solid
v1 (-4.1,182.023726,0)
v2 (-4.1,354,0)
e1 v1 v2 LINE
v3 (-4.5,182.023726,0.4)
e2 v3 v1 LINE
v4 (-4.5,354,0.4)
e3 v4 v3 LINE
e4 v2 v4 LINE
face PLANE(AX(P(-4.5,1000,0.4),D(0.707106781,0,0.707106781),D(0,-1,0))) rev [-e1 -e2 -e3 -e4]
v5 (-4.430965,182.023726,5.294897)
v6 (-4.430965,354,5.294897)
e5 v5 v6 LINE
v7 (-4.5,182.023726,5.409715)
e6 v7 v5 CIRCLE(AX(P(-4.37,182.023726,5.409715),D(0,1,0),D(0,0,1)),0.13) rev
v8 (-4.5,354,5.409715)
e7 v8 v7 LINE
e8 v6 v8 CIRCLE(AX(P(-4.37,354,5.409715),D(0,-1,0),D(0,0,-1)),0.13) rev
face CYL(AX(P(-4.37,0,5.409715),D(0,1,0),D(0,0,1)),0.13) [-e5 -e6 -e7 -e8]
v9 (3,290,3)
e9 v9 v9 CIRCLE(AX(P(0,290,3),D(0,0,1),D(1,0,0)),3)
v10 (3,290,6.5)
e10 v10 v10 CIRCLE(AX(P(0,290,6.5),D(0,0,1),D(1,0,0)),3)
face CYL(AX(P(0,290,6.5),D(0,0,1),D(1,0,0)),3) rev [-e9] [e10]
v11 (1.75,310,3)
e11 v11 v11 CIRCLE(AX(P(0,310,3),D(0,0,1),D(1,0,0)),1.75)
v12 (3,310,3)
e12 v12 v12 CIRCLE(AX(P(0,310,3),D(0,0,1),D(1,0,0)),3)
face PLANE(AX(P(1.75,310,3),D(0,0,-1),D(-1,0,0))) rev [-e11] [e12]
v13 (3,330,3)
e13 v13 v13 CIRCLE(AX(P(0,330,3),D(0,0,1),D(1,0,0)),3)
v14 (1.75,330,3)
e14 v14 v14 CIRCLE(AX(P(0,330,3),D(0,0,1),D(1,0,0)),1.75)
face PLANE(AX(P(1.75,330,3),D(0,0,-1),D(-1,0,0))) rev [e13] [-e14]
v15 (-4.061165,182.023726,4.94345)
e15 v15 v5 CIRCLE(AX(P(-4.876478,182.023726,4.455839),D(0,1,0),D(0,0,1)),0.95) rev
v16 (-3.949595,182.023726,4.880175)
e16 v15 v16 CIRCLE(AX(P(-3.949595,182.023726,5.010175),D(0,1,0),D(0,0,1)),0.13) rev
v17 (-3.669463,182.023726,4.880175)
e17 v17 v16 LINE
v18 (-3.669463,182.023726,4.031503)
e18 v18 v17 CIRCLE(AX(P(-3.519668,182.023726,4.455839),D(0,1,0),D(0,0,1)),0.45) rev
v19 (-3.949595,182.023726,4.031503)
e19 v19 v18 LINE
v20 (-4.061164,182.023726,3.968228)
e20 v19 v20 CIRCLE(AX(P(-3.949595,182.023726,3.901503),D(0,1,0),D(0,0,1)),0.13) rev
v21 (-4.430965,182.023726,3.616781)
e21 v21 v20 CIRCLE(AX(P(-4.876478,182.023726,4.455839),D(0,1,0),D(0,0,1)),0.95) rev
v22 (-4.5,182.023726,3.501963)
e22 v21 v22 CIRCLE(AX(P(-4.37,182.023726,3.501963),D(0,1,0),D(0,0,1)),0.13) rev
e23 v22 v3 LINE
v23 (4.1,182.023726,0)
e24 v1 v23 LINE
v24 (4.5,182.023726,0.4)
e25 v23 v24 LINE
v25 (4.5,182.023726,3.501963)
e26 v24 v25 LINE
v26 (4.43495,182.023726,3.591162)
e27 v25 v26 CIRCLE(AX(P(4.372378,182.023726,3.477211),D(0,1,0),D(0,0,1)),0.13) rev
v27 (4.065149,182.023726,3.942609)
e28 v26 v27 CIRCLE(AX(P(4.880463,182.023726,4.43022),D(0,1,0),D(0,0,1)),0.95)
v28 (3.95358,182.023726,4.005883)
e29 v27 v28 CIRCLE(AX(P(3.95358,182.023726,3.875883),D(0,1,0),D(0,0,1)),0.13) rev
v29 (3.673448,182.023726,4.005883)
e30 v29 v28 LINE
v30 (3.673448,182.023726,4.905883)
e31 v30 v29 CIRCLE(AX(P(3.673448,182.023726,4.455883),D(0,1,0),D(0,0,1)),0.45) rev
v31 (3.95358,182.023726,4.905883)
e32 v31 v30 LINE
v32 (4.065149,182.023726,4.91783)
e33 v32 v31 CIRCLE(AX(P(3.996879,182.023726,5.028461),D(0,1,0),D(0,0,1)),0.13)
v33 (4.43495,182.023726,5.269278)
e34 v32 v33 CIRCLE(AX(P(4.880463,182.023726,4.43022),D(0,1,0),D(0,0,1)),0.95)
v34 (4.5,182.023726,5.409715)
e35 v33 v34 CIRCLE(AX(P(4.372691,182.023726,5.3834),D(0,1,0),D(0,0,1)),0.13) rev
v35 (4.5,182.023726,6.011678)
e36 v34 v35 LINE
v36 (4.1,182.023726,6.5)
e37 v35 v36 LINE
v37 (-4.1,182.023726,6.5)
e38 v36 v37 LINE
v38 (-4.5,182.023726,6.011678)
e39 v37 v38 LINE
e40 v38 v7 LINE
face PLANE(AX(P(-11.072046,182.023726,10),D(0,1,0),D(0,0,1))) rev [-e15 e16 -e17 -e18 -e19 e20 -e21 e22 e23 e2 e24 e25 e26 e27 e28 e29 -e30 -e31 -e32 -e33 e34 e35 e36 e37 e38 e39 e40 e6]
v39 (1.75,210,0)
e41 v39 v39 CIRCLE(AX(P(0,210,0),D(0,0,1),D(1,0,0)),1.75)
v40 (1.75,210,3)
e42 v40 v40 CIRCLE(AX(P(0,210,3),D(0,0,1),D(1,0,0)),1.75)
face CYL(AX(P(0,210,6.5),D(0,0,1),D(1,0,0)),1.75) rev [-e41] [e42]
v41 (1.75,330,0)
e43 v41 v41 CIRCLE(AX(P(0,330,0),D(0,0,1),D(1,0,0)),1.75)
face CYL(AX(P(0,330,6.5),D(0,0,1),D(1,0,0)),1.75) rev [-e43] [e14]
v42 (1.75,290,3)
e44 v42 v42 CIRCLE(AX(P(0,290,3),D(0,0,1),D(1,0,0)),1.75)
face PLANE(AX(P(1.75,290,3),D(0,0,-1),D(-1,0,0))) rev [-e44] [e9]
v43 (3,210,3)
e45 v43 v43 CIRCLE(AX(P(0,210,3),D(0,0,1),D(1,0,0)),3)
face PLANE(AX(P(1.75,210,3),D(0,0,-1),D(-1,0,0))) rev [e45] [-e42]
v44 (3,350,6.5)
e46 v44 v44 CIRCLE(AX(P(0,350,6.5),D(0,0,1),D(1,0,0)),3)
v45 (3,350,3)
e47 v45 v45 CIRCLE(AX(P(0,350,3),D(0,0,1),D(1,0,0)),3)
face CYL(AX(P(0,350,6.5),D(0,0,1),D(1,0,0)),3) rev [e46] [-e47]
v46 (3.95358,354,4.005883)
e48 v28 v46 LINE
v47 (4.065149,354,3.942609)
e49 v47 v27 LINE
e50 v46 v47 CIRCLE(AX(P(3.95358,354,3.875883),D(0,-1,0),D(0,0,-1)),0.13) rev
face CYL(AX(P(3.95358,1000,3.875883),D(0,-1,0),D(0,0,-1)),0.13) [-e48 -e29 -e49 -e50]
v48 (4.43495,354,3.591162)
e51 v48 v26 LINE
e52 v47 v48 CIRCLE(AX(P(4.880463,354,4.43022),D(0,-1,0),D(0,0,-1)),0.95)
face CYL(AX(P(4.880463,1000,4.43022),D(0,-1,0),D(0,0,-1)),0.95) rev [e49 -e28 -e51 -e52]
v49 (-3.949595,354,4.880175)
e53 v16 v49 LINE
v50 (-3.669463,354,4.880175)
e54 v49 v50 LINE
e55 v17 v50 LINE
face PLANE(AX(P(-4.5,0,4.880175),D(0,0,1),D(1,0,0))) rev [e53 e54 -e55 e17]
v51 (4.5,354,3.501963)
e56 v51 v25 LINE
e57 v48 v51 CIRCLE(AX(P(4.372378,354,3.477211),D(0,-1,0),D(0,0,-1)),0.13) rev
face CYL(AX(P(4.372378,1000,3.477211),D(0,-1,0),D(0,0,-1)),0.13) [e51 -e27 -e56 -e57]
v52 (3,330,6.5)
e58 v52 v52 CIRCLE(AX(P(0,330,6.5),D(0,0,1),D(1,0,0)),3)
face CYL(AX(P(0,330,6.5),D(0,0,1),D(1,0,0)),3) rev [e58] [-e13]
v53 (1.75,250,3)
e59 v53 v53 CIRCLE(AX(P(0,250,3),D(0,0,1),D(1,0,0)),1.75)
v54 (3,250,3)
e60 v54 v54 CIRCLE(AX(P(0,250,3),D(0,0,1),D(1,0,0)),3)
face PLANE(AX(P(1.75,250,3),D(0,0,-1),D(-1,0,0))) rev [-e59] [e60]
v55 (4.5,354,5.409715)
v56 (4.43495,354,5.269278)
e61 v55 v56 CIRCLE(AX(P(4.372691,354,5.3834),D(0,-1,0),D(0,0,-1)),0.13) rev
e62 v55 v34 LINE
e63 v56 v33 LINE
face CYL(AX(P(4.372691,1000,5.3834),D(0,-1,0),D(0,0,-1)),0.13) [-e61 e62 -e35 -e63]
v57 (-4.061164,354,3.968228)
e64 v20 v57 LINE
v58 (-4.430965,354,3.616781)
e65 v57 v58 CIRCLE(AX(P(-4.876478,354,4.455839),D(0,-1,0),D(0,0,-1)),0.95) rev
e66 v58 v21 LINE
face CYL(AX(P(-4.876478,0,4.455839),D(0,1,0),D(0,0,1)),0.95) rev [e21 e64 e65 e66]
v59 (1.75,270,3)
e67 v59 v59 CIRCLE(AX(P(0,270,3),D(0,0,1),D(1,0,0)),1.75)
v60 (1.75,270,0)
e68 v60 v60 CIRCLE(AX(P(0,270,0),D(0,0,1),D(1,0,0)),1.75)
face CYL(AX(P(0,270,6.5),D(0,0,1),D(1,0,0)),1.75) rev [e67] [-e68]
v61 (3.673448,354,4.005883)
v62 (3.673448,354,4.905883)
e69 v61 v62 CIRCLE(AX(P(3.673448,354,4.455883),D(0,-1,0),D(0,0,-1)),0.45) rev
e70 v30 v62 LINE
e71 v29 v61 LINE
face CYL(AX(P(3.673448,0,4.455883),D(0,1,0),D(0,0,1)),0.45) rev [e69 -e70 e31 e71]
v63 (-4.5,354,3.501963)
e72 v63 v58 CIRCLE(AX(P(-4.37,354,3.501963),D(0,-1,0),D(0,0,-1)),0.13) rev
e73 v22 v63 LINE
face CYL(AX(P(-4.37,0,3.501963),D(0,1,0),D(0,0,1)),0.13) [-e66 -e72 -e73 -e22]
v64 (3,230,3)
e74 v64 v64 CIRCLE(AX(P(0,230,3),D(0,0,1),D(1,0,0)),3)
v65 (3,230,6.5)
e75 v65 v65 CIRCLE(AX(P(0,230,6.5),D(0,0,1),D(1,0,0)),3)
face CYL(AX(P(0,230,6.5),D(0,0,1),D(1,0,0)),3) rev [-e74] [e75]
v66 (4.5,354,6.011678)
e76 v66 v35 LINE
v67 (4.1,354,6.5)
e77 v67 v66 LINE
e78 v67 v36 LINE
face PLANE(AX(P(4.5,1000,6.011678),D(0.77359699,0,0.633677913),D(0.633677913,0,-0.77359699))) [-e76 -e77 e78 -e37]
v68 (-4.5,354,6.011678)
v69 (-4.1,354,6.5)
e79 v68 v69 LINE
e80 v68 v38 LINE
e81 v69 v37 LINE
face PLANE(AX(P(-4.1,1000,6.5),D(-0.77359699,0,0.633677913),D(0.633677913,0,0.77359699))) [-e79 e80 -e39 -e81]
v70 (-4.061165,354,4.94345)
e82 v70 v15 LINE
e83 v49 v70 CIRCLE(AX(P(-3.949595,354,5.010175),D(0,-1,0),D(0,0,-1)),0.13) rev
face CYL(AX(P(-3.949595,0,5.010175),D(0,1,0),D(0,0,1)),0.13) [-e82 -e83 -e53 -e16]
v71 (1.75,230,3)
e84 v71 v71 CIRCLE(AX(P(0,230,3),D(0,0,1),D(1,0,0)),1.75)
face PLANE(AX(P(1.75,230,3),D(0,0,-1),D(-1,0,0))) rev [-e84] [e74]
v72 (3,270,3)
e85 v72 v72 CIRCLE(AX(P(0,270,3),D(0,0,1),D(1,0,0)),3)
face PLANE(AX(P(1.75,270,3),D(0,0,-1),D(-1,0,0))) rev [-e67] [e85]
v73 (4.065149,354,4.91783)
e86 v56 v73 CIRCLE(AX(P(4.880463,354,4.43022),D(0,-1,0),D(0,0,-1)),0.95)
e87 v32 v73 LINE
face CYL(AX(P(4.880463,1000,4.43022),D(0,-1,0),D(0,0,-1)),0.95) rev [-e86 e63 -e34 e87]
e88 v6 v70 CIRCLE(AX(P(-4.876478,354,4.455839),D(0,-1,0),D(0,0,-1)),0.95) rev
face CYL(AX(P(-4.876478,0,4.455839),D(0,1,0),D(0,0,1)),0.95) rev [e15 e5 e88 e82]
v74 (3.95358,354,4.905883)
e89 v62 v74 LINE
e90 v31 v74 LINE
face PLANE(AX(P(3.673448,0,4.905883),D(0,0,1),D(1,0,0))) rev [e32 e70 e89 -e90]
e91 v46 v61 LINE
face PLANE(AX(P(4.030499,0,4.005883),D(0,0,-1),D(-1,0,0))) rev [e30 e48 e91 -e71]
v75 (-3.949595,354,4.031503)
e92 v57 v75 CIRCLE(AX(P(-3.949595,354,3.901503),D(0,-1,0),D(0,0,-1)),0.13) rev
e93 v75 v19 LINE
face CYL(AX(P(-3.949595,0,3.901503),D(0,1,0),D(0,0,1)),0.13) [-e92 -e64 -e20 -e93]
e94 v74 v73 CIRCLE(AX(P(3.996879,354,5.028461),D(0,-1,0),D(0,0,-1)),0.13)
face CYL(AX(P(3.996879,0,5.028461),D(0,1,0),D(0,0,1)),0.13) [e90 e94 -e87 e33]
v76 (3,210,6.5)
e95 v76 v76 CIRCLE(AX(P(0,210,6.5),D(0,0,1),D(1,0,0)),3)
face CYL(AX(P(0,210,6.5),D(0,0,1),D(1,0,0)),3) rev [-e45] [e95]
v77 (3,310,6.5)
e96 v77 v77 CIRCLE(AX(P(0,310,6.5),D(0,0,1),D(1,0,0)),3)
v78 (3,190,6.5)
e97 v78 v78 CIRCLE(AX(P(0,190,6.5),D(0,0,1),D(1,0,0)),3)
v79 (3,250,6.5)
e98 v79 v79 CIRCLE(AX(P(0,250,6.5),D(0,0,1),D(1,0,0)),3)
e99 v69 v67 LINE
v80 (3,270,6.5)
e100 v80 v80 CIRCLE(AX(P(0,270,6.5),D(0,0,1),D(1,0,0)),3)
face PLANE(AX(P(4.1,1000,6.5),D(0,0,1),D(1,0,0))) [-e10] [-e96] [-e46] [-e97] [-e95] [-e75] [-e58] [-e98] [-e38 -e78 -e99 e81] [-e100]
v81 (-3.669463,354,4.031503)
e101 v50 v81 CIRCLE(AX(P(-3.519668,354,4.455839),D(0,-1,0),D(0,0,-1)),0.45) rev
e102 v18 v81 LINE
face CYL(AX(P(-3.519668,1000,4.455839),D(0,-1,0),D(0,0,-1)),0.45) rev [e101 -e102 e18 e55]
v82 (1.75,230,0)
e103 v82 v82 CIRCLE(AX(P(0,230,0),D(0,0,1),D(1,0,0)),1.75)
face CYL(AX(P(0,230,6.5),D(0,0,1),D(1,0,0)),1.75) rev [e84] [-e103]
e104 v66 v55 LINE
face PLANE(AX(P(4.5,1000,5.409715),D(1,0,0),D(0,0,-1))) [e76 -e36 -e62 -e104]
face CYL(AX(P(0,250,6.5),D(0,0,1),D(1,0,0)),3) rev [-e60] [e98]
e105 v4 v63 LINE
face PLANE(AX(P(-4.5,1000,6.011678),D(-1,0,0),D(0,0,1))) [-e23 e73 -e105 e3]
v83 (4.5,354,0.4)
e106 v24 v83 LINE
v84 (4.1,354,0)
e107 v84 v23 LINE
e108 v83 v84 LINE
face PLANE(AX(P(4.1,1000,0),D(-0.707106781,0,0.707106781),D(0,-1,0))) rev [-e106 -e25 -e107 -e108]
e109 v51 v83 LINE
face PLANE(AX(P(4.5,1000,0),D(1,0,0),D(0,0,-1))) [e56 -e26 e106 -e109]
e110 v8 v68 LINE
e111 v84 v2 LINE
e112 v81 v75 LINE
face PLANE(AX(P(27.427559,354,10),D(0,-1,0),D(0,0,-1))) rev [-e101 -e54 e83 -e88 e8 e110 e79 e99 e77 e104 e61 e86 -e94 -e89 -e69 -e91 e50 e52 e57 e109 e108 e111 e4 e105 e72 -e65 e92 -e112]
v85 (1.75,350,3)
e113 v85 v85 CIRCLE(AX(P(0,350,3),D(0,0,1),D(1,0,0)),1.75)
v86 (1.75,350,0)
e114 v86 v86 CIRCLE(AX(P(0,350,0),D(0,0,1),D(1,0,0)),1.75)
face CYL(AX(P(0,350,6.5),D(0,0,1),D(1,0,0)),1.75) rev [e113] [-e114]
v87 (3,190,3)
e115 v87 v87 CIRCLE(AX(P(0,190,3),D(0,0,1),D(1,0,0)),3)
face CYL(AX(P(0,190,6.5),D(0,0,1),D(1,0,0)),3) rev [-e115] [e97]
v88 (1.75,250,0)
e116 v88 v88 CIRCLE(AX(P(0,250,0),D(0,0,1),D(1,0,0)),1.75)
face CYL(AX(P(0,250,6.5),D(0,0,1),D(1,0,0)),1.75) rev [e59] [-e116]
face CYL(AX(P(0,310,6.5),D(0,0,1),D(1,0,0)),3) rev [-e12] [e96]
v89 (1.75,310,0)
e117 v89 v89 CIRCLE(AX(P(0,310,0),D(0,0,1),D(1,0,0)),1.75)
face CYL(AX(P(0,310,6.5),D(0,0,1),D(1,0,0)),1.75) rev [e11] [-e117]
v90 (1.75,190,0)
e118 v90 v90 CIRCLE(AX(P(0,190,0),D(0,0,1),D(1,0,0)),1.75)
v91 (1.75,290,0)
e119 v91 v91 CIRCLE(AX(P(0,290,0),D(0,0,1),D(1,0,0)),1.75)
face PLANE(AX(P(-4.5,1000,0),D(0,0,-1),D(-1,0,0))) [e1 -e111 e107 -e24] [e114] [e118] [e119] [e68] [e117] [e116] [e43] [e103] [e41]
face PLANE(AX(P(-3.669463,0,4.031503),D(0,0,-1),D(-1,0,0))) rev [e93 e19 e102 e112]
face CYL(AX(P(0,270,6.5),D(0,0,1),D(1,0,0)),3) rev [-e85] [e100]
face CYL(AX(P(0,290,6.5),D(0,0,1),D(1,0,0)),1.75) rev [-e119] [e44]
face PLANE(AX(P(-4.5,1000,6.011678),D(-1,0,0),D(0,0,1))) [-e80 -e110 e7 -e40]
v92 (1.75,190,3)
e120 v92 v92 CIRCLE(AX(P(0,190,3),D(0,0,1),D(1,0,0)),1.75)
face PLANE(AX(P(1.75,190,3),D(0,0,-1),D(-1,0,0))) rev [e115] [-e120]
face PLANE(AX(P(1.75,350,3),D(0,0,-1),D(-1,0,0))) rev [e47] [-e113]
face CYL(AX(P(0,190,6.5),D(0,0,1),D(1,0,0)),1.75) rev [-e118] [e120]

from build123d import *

# Parameters (mm, degrees)
RESSALTO_EXTRUS_O1_DEPTH                             = 1000
CORTE_EXTRUS_O1_START                                = -1000
CORTE_EXTRUS_O1_DEPTH                                = 1000
CORTE_EXTRUS_O2_DEPTH                                = 1001.031261626
CORTE_EXTRUS_O3_DEPTH                                = 1001.031261626
CORTE_EXTRUS_O4_DEPTH                                = 1001.031261626
CORTE_EXTRUS_O5_DEPTH                                = 0.002166667
CORTE_EXTRUS_O6_DEPTH                                = 0.002166667
CORTE_EXTRUS_O7_DEPTH                                = 0.002166667
CORTE_EXTRUS_O8_DEPTH                                = 0.002166667
INCLINA_O1_ANGLE                                     = 45.1469538
ESBO_O10_W                                           = 0.450000001
ESBO_O10_H                                           = 1000
REBAIXO_PARA_PARAFUSO_DE_M_QUINA_DE_CABE_D           = 3.5
REBAIXO_PARA_PARAFUSO_DE_M_QUINA_DE_CABE_CBORE_D     = 6
REBAIXO_PARA_PARAFUSO_DE_M_QUINA_DE_CABE_CBORE_DEPTH = 3.50000002
CHANFRO1_SIZE                                        = 0.062563219
CHANFRO1_SIZE2                                       = 0.062205617
CHANFRO3_START                                       = -3.730761794
CHANFRO3_DEPTH                                       = 0.399013115
CHANFRO4_SIZE                                        = 0.4
FILETE1_R                                            = 0.130000023
SKETCH1_W                                            = 36.072768502
SKETCH1_H                                            = 659.552877555
SKETCH1_W_2                                          = 21.632087489
SKETCH1_H_2                                          = 215.829832124
CUT_EXTRUDE1_DEPTH                                   = 10


with BuildPart() as part:
    # Esboço1 → Ressalto-extrusão1 (new body)
    with BuildSketch(Plane.XZ):
        with BuildLine():
            Line((4.5, 5.4097155), (4.5, 6.01167813))
            Line((4.5, 6.01167813), (4.1, 6.50000002))
            Line((4.1, 6.50000002), (-4.1, 6.50000002))
            Line((-4.1, 6.50000002), (-4.5, 6.01167813))
            Line((-4.5, 6.01167813), (-4.5, 2e-08))
            Line((-4.5, 2e-08), (4.5, 2e-08))
            Line((4.5, 2e-08), (4.5, 3.50196265))
            ThreePointArc((4.5, 3.50196265), (4.477413879, 3.553810372), (4.43494978, 3.59116167))
            ThreePointArc((4.43494978, 3.59116167), (3.930462682, 4.43021964), (4.43494978, 5.26927761))
            ThreePointArc((4.43494978, 5.26927761), (4.490651601, 5.328761203), (4.5, 5.4097155))
        make_face()
    extrude(amount=-RESSALTO_EXTRUS_O1_DEPTH)

    # Esboço2 → Corte-extrusão1 (cut)
    with BuildSketch(Plane(origin=(0, 1000, 0), x_dir=(-1, 0, 0), z_dir=(0, 1, 0)).offset(CORTE_EXTRUS_O1_START)):
        with BuildLine():
            Line((-4.030498711, 4.00588336), (-3.673447948, 4.00588336))
            ThreePointArc((-3.673447948, 4.00588336), (-3.223447946, 4.455883362), (-3.673447948, 4.905883363))
            Line((-3.673447948, 4.905883363), (-3.953580008, 4.905883363))
            ThreePointArc((-3.953580008, 4.905883363), (-4.010719931, 4.899199784), (-4.065149208, 4.917830263))
            ThreePointArc((-4.065149208, 4.917830263), (-3.93114763, 4.466290066), (-4.030498711, 4.00588336))
        make_face()
    extrude(amount=CORTE_EXTRUS_O1_DEPTH, mode=Mode.SUBTRACT)

    # Esboço3 → Corte-extrusão2 (cut, through all)
    with BuildSketch(Plane(origin=(0, 1000, 0), x_dir=(-1, 0, 0), z_dir=(0, 1, 0))):
        with BuildLine():
            Line((4.5, 4.03150278), (4.5, 4.88017535))
            Line((4.5, 4.88017535), (3.66946318, 4.88017535))
            ThreePointArc((3.66946318, 4.88017535), (3.969667593, 4.455839065), (3.66946318, 4.03150278))
            Line((3.66946318, 4.03150278), (4.5, 4.03150278))
        make_face()
    extrude(amount=-CORTE_EXTRUS_O2_DEPTH, mode=Mode.SUBTRACT)

    # Esboço4 → Corte-extrusão3 (cut, through all)
    with BuildSketch(Plane(origin=(0, 1000, 0), x_dir=(-1, 0, 0), z_dir=(0, 1, 0))):
        with BuildLine():
            Line((4.026513974, 4.88017535), (4.5, 4.88017535))
            Line((4.5, 4.88017535), (4.5, 5.328056964))
            ThreePointArc((4.5, 5.328056964), (4.223646078, 5.145991535), (4.026513974, 4.88017535))
        make_face()
    extrude(amount=-CORTE_EXTRUS_O3_DEPTH, mode=Mode.SUBTRACT)

    # Esboço5 → Corte-extrusão4 (cut, through all)
    with BuildSketch(Plane(origin=(0, 1000, 0), x_dir=(-1, 0, 0), z_dir=(0, 1, 0))):
        with BuildLine():
            Line((4.5, 3.583620931), (4.5, 4.03150278))
            Line((4.5, 4.03150278), (4.026513856, 4.03150278))
            ThreePointArc((4.026513856, 4.03150278), (4.223645982, 3.76568645), (4.5, 3.583620931))
        make_face()
    extrude(amount=-CORTE_EXTRUS_O4_DEPTH, mode=Mode.SUBTRACT)

    # Esboço6 → Corte-extrusão5 (cut)
    with BuildSketch(Plane(origin=(0, 1000, 0), x_dir=(-1, 0, 0), z_dir=(0, 1, 0))):
        Polygon((0.891369267, 3.403698133), (0.714701433, 3.168235633), (0.2187042, 2.61105), (1.0945792, 2.61105), (1.0945792, 2.695983333), (0.398689633, 2.695983333), (0.794326433, 3.149466667), (0.9743123, 3.3891), (1.067110588, 3.573407857), (0.95413722, 3.802321701), (0.7876908, 3.88505), (0.54301, 3.88505), (0.375434678, 3.803592619), (0.295011167, 3.6384023), (0.295011167, 3.562), (0.3812718, 3.562), (0.3812718, 3.631766667), (0.437672733, 3.743620833), (0.549645633, 3.800116667), (0.7802262, 3.800116667), (0.893028067, 3.743810633), (0.976240026, 3.576039029), align=None)
    extrude(amount=-CORTE_EXTRUS_O5_DEPTH, mode=Mode.SUBTRACT)

    # Esboço7 → Corte-extrusão6 (cut)
    with BuildSketch(Plane.XZ):
        Polygon((-0.214632167, 3.88505), (-0.953983333, 3.88505), (-0.953983333, 2.61105), (-0.214632167, 2.61105), (-0.214632167, 2.695983333), (-0.86905, 2.695983333), (-0.86905, 3.205583333), (-0.5123963, 3.205583333), (-0.5123963, 3.290516667), (-0.86905, 3.290516667), (-0.86905, 3.800116667), (-0.214632167, 3.800116667), align=None)
    extrude(amount=-CORTE_EXTRUS_O6_DEPTH, mode=Mode.SUBTRACT)

    # Esboço8 → Corte-extrusão7 (cut)
    with BuildSketch(Plane(origin=(0, 1000, 0), x_dir=(-1, 0, 0), z_dir=(0, 1, 0))):
        Polygon((-0.214632167, 3.88505), (-0.953983333, 3.88505), (-0.953983333, 2.61105), (-0.214632167, 2.61105), (-0.214632167, 2.695983333), (-0.86905, 2.695983333), (-0.86905, 3.205583333), (-0.5123963, 3.205583333), (-0.5123963, 3.290516667), (-0.86905, 3.290516667), (-0.86905, 3.800116667), (-0.214632167, 3.800116667), align=None)
    extrude(amount=-CORTE_EXTRUS_O7_DEPTH, mode=Mode.SUBTRACT)

    # Esboço9 → Corte-extrusão8 (cut)
    with BuildSketch(Plane.XZ):
        Polygon((0.510057167, 3.620830633), (0.6071, 3.718655633), (0.6071, 2.609403333), (0.692033333, 2.609403333), (0.692033333, 3.883403333), (0.6741176, 3.883403333), (0.6741176, 3.795069794), (0.3690544, 3.640736667), (0.3690544, 3.551253333), align=None)
    extrude(amount=-CORTE_EXTRUS_O8_DEPTH, mode=Mode.SUBTRACT)

    # Inclinação1
    inclina_o1_faces = [part.faces().sort_by_distance(p)[0] for p in [
        (0.6741176, 0.001083333, 3.839236564),
    ]]
    draft(inclina_o1_faces, Plane(origin=(0.692033333, 0.002166667, 3.883403333), x_dir=(-1, 0, 0), z_dir=(0, 0, -1)), INCLINA_O1_ANGLE)

    # Esboço10 → Corte-Revolução1 (revolve, cut)
    with BuildSketch(Plane.XY.offset(4.455839065)):
        with Locations((-3.294667591, 500)):
            Rectangle(ESBO_O10_W, ESBO_O10_H)
    revolve(axis=Axis((-3.519667591, 1000, 4.455839065), (0, -1, 0)), mode=Mode.SUBTRACT)

    # Rebaixo para parafuso de máquina de cabeça sextavada de M31 (through all)
    with Locations(Plane.XY.offset(6.50000002)):
        with Locations((0, 990), (0, 970), (0, 950), (0, 930), (0, 910), (0, 890), (0, 870), (0, 850), (0, 830), (0, 810), (0, 790), (0, 770), (0, 750), (0, 730), (0, 710), (0, 690), (0, 670), (0, 650), (0, 630), (0, 610), (0, 590), (0, 570), (0, 550), (0, 530), (0, 510), (0, 490), (0, 470), (0, 450), (0, 430), (0, 410), (0, 390), (0, 370), (0, 350), (0, 330), (0, 310), (0, 290), (0, 270), (0, 250), (0, 230), (0, 210), (0, 190), (0, 170), (0, 150), (0, 130), (0, 110), (0, 90), (0, 70), (0, 50), (0, 30), (0, 10)):
            CounterBoreHole(REBAIXO_PARA_PARAFUSO_DE_M_QUINA_DE_CABE_D / 2, REBAIXO_PARA_PARAFUSO_DE_M_QUINA_DE_CABE_CBORE_D / 2, REBAIXO_PARA_PARAFUSO_DE_M_QUINA_DE_CABE_CBORE_DEPTH)

    # Chanfro1
    chanfro1_edges = [part.edges().sort_by_distance(p)[0] for p in [
        (-0.976240026, 999.998916667, 3.576039029),
    ]]
    chanfro1_side = [part.faces().sort_by_distance(p)[0] for p in [
        (-0.933804646, 999.998916667, 3.489868581),
    ]]
    chamfer(chanfro1_edges, length=CHANFRO1_SIZE, length2=CHANFRO1_SIZE2, reference=chanfro1_side[0])

    # Chanfro3: read off the stored shape, not the designer's step
    # Chanfro3 outline → Chanfro3 (add)
    with BuildSketch(Plane(origin=(0, 0, 0), x_dir=(0.8991051825477068, 0, 0.43773264753254887), z_dir=(0.4377326475325489, 0, -0.8991051825477069)).offset(CHANFRO3_START)):
        Polygon((1.327401403, -999.997833333), (1.31122788, -999.997833333), (1.311999664, -1000), (1.327401403, -1000), align=None)
    extrude(amount=CHANFRO3_DEPTH)

    # Chanfro4
    chanfro4_edges = [part.edges().sort_by_distance(p)[0] for p in [
        (4.5, 500, 2e-08),
        (-4.5, 500, 2e-08),
    ]]
    chamfer(chanfro4_edges, length=CHANFRO4_SIZE)

    # Filete1
    filete1_edges = [part.edges().sort_by_distance(p)[0] for p in [
        (4.030498711, 500, 4.00588336),
        (-4.026513974, 500, 4.88017535),
        (-4.5, 500, 5.328056964),
        (-4.5, 500, 3.583620931),
        (-4.026513856, 500, 4.03150278),
    ]]
    fillet(filete1_edges, radius=FILETE1_R)

    # Sketch1 → Cut-Extrude1 (cut)
    with BuildSketch(Plane(origin=(0, 0, 0), x_dir=(-1, 0, 0), z_dir=(0, 0, -1))):
        with Locations((-9.39117436, 683.776438778)):
            Rectangle(SKETCH1_W, SKETCH1_H)
        with Locations((0.25600221, 74.108809522)):
            Rectangle(SKETCH1_W_2, SKETCH1_H_2)
    extrude(amount=-CUT_EXTRUDE1_DEPTH, mode=Mode.SUBTRACT)


solid = part.part
